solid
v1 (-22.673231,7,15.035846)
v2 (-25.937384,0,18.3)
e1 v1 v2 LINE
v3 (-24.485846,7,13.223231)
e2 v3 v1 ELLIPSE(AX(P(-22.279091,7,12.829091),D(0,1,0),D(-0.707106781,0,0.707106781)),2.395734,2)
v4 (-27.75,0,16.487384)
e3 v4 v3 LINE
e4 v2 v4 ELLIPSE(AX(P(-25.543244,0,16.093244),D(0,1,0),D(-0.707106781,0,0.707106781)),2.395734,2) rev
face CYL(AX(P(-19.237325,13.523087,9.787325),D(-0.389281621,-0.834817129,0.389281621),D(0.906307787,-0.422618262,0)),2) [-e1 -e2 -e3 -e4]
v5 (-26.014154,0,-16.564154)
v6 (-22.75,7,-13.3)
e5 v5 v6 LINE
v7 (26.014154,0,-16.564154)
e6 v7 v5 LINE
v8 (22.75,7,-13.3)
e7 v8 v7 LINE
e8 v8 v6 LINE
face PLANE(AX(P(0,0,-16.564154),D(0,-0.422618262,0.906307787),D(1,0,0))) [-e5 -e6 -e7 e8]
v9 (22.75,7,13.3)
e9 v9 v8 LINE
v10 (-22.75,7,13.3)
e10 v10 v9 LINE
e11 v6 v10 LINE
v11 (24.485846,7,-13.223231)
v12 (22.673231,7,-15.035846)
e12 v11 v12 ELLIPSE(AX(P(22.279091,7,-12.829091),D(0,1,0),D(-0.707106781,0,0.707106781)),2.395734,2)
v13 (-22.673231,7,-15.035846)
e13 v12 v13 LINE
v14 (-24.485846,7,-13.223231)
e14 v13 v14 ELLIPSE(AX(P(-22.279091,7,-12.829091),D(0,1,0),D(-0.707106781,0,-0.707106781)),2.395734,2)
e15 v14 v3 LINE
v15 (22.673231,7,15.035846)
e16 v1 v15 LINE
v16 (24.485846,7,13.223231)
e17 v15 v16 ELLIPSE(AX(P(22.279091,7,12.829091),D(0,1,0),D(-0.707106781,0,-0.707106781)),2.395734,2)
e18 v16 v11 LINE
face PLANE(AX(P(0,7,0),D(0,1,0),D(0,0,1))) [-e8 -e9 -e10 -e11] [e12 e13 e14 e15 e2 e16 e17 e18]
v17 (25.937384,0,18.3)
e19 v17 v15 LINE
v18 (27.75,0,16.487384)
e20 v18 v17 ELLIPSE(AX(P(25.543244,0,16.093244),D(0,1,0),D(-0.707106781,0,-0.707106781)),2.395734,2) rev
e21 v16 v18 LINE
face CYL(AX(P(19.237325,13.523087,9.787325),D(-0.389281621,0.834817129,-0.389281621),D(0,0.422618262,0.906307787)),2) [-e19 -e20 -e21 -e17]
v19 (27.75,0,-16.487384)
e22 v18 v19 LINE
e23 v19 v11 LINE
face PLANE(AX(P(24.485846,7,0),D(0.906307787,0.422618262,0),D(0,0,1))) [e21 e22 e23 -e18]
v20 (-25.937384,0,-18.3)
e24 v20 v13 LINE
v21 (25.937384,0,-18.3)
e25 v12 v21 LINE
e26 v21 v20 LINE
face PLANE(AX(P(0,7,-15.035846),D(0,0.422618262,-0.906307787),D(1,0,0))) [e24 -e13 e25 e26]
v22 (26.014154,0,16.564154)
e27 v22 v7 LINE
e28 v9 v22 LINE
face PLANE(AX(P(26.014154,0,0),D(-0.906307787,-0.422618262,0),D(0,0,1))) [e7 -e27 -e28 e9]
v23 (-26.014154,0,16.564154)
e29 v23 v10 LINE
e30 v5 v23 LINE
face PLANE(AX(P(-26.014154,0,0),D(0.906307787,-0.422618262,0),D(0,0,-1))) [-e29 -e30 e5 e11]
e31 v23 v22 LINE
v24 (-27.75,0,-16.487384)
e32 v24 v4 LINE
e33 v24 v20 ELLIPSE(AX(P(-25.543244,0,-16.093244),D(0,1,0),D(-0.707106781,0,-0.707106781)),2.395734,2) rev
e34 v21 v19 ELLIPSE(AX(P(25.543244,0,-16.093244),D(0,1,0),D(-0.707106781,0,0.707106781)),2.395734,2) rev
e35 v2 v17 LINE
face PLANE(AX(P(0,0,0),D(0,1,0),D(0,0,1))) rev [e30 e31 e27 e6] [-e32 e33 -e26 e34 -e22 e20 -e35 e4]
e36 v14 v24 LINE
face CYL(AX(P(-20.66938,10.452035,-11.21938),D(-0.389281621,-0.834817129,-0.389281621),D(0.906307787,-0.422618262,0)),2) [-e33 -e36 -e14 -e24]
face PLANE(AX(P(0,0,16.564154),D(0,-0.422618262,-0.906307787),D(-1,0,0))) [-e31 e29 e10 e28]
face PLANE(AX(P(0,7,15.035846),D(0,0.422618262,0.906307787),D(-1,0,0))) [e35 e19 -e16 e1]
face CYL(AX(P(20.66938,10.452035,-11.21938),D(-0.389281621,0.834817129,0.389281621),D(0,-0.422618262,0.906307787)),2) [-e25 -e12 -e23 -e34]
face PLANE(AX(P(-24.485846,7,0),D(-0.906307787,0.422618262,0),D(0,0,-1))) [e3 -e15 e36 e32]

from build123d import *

# Parameters (mm, degrees)
ESQUISSE2_W        = 55.5
ESQUISSE2_H        = 36.6
ESQUISSE2_W_2      = 45.5
ESQUISSE2_H_2      = 26.6
BOSS_EXTRU_1_DEPTH = 7
CONG_3_R           = 2


with BuildPart() as part:
    # Esquisse2 → Boss.-Extru.1 (new body)
    with BuildSketch(Plane(origin=(0, 0, 0), x_dir=(1, 0, 0), z_dir=(0, 1, 0))):
        Rectangle(ESQUISSE2_W, ESQUISSE2_H)
        Rectangle(ESQUISSE2_W_2, ESQUISSE2_H_2, mode=Mode.SUBTRACT)
    extrude(amount=BOSS_EXTRU_1_DEPTH)

    # Chanfrein1
    # the kernel refuses this chamfer: 7, 3.264153607 mm, written as the material it takes off along each edge
    with BuildSketch(Plane(origin=(27.75, 7, 18.3), x_dir=(0, -0.9998669641130704, 0.01631116413111024), z_dir=(-1, 0, 0)), Plane(origin=(-27.75, 7, -18.3), x_dir=(0, -0.9998669641130704, -0.01631116413111024), z_dir=(1, 0, 0))) as chanfrein1_piece_1:
        with BuildLine():
            Line((7.25473132, 0), (-0.308904716, -3.377897506))
            Line((-0.308904716, -3.377897506), (-0.448886091, -3.375613943))
            ThreePointArc((-0.448886091, -3.375613943), (-0.167567523, -1.688734801), (-0.139981375, 0.002283563))
            Line((-0.139981375, 0.002283563), (0.002283563, 0.139981375))
            ThreePointArc((0.002283563, 0.139981375), (3.628684148, 0.08082269), (7.257014883, 0.139981375))
            Line((7.257014883, 0.139981375), (7.25473132, 0))
        make_face()
    extrude(amount=55.5, mode=Mode.SUBTRACT)
    with BuildSketch(Plane(origin=(27.75, 7, -18.3), x_dir=(0.01631116413111024, -0.9998669641130704, 0), z_dir=(0, 0, 1)), Plane(origin=(-27.75, 7, 18.3), x_dir=(-0.01631116413111024, -0.9998669641130704, 0), z_dir=(0, 0, -1))) as chanfrein1_piece_2:
        with BuildLine():
            Line((7.25473132, 0), (-0.308904716, -3.377897506))
            Line((-0.308904716, -3.377897506), (-0.448886091, -3.375613943))
            ThreePointArc((-0.448886091, -3.375613943), (-0.167567523, -1.688734801), (-0.139981375, 0.002283563))
            Line((-0.139981375, 0.002283563), (0.002283563, 0.139981375))
            ThreePointArc((0.002283563, 0.139981375), (3.628684148, 0.08082269), (7.257014883, 0.139981375))
            Line((7.257014883, 0.139981375), (7.25473132, 0))
        make_face()
    extrude(amount=36.6, mode=Mode.SUBTRACT)
    with BuildSketch(Plane(origin=(22.75, 0, 13.3), x_dir=(0, 0.9998669641130704, -0.016311164131110483), z_dir=(-1, 0, 0)), Plane(origin=(-22.75, 0, -13.3), x_dir=(0, 0.9998669641130704, 0.016311164131110483), z_dir=(1, 0, 0))) as chanfrein1_piece_3:
        with BuildLine():
            Line((7.25473132, 0), (-0.308904716, -3.377897506))
            Line((-0.308904716, -3.377897506), (-0.448886091, -3.375613943))
            ThreePointArc((-0.448886091, -3.375613943), (-0.167567523, -1.688734801), (-0.139981375, 0.002283563))
            Line((-0.139981375, 0.002283563), (0.002283563, 0.139981375))
            ThreePointArc((0.002283563, 0.139981375), (3.628684148, 0.08082269), (7.257014883, 0.139981375))
            Line((7.257014883, 0.139981375), (7.25473132, 0))
        make_face()
    extrude(amount=45.5, mode=Mode.SUBTRACT)
    with BuildSketch(Plane(origin=(-22.75, 0, 13.3), x_dir=(0.01631116413111024, 0.9998669641130704, 0), z_dir=(0, 0, -1)), Plane(origin=(22.75, 0, -13.3), x_dir=(-0.01631116413111024, 0.9998669641130704, 0), z_dir=(0, 0, 1))) as chanfrein1_piece_4:
        with BuildLine():
            Line((7.25473132, 0), (-0.308904716, -3.377897506))
            Line((-0.308904716, -3.377897506), (-0.448886091, -3.375613943))
            ThreePointArc((-0.448886091, -3.375613943), (-0.167567523, -1.688734801), (-0.139981375, 0.002283563))
            Line((-0.139981375, 0.002283563), (0.002283563, 0.139981375))
            ThreePointArc((0.002283563, 0.139981375), (3.628684148, 0.08082269), (7.257014883, 0.139981375))
            Line((7.257014883, 0.139981375), (7.25473132, 0))
        make_face()
    extrude(amount=26.6, mode=Mode.SUBTRACT)
    with BuildSketch(Plane(origin=(27.75, 7, -18.3), x_dir=(0.01631116413111024, -0.9998669641130704, 0), z_dir=(0, 0, 1))) as chanfrein1_piece_5a_section:
        with BuildLine():
            Line((7.25473132, 0), (-0.308904716, -3.377897506))
            Line((-0.308904716, -3.377897506), (-0.448886091, -3.375613943))
            ThreePointArc((-0.448886091, -3.375613943), (-0.167567523, -1.688734801), (-0.139981375, 0.002283563))
            Line((-0.139981375, 0.002283563), (0.002283563, 0.139981375))
            ThreePointArc((0.002283563, 0.139981375), (3.628684148, 0.08082269), (7.257014883, 0.139981375))
            Line((7.257014883, 0.139981375), (7.25473132, 0))
        make_face()
    chanfrein1_piece_5a = extrude(amount=54.7368283, mode=Mode.PRIVATE)
    chanfrein1_piece_5a = split(chanfrein1_piece_5a, bisect_by=Plane(origin=(26.72067158, 4.632350976, 18.3), z_dir=(0, 0, 1)), keep=Keep.TOP, mode=Mode.PRIVATE)
    with BuildSketch(Plane(origin=(45.8868283, 7, 18.3), x_dir=(0, -0.9998669641130704, 0.01631116413111024), z_dir=(-1, 0, 0))) as chanfrein1_piece_5b_section:
        with BuildLine():
            Line((7.25473132, 0), (-0.308904716, -3.377897506))
            Line((-0.308904716, -3.377897506), (-0.448886091, -3.375613943))
            ThreePointArc((-0.448886091, -3.375613943), (-0.167567523, -1.688734801), (-0.139981375, 0.002283563))
            Line((-0.139981375, 0.002283563), (0.002283563, 0.139981375))
            ThreePointArc((0.002283563, 0.139981375), (3.628684148, 0.08082269), (7.257014883, 0.139981375))
            Line((7.257014883, 0.139981375), (7.25473132, 0))
        make_face()
    chanfrein1_piece_5b = extrude(amount=73.6368283, mode=Mode.PRIVATE)
    chanfrein1_piece_5b = split(chanfrein1_piece_5b, bisect_by=Plane(origin=(27.75, 4.632350976, 17.27067158), z_dir=(1, 0, 0)), keep=Keep.TOP, mode=Mode.PRIVATE)
    chanfrein1_piece_5 = chanfrein1_piece_5a & chanfrein1_piece_5b
    add(chanfrein1_piece_5, mode=Mode.SUBTRACT)
    with BuildSketch(Plane(origin=(27.75, 7, 18.3), x_dir=(0, -0.9998669641130704, 0.01631116413111024), z_dir=(-1, 0, 0))) as chanfrein1_piece_6a_section:
        with BuildLine():
            Line((7.25473132, 0), (-0.308904716, -3.377897506))
            Line((-0.308904716, -3.377897506), (-0.448886091, -3.375613943))
            ThreePointArc((-0.448886091, -3.375613943), (-0.167567523, -1.688734801), (-0.139981375, 0.002283563))
            Line((-0.139981375, 0.002283563), (0.002283563, 0.139981375))
            ThreePointArc((0.002283563, 0.139981375), (3.628684148, 0.08082269), (7.257014883, 0.139981375))
            Line((7.257014883, 0.139981375), (7.25473132, 0))
        make_face()
    chanfrein1_piece_6a = extrude(amount=73.6368283, mode=Mode.PRIVATE)
    chanfrein1_piece_6a = split(chanfrein1_piece_6a, bisect_by=Plane(origin=(-27.75, 4.632350976, 17.27067158), z_dir=(-1, 0, 0)), keep=Keep.TOP, mode=Mode.PRIVATE)
    with BuildSketch(Plane(origin=(-27.75, 7, 36.4368283), x_dir=(-0.01631116413111024, -0.9998669641130704, 0), z_dir=(0, 0, -1))) as chanfrein1_piece_6b_section:
        with BuildLine():
            Line((7.25473132, 0), (-0.308904716, -3.377897506))
            Line((-0.308904716, -3.377897506), (-0.448886091, -3.375613943))
            ThreePointArc((-0.448886091, -3.375613943), (-0.167567523, -1.688734801), (-0.139981375, 0.002283563))
            Line((-0.139981375, 0.002283563), (0.002283563, 0.139981375))
            ThreePointArc((0.002283563, 0.139981375), (3.628684148, 0.08082269), (7.257014883, 0.139981375))
            Line((7.257014883, 0.139981375), (7.25473132, 0))
        make_face()
    chanfrein1_piece_6b = extrude(amount=54.7368283, mode=Mode.PRIVATE)
    chanfrein1_piece_6b = split(chanfrein1_piece_6b, bisect_by=Plane(origin=(-26.72067158, 4.632350976, 18.3), z_dir=(0, 0, 1)), keep=Keep.TOP, mode=Mode.PRIVATE)
    chanfrein1_piece_6 = chanfrein1_piece_6a & chanfrein1_piece_6b
    add(chanfrein1_piece_6, mode=Mode.SUBTRACT)
    with BuildSketch(Plane(origin=(-27.75, 7, -18.3), x_dir=(0, -0.9998669641130704, -0.01631116413111024), z_dir=(1, 0, 0))) as chanfrein1_piece_7a_section:
        with BuildLine():
            Line((7.25473132, 0), (-0.308904716, -3.377897506))
            Line((-0.308904716, -3.377897506), (-0.448886091, -3.375613943))
            ThreePointArc((-0.448886091, -3.375613943), (-0.167567523, -1.688734801), (-0.139981375, 0.002283563))
            Line((-0.139981375, 0.002283563), (0.002283563, 0.139981375))
            ThreePointArc((0.002283563, 0.139981375), (3.628684148, 0.08082269), (7.257014883, 0.139981375))
            Line((7.257014883, 0.139981375), (7.25473132, 0))
        make_face()
    chanfrein1_piece_7a = extrude(amount=73.6368283, mode=Mode.PRIVATE)
    chanfrein1_piece_7a = split(chanfrein1_piece_7a, bisect_by=Plane(origin=(27.75, 4.632350976, -17.27067158), z_dir=(1, 0, 0)), keep=Keep.TOP, mode=Mode.PRIVATE)
    with BuildSketch(Plane(origin=(27.75, 7, -36.4368283), x_dir=(0.01631116413111024, -0.9998669641130704, 0), z_dir=(0, 0, 1))) as chanfrein1_piece_7b_section:
        with BuildLine():
            Line((7.25473132, 0), (-0.308904716, -3.377897506))
            Line((-0.308904716, -3.377897506), (-0.448886091, -3.375613943))
            ThreePointArc((-0.448886091, -3.375613943), (-0.167567523, -1.688734801), (-0.139981375, 0.002283563))
            Line((-0.139981375, 0.002283563), (0.002283563, 0.139981375))
            ThreePointArc((0.002283563, 0.139981375), (3.628684148, 0.08082269), (7.257014883, 0.139981375))
            Line((7.257014883, 0.139981375), (7.25473132, 0))
        make_face()
    chanfrein1_piece_7b = extrude(amount=54.7368283, mode=Mode.PRIVATE)
    chanfrein1_piece_7b = split(chanfrein1_piece_7b, bisect_by=Plane(origin=(26.72067158, 4.632350976, -18.3), z_dir=(0, 0, -1)), keep=Keep.TOP, mode=Mode.PRIVATE)
    chanfrein1_piece_7 = chanfrein1_piece_7a & chanfrein1_piece_7b
    add(chanfrein1_piece_7, mode=Mode.SUBTRACT)
    with BuildSketch(Plane(origin=(-45.8868283, 7, -18.3), x_dir=(0, -0.9998669641130704, -0.01631116413111024), z_dir=(1, 0, 0))) as chanfrein1_piece_8a_section:
        with BuildLine():
            Line((7.25473132, 0), (-0.308904716, -3.377897506))
            Line((-0.308904716, -3.377897506), (-0.448886091, -3.375613943))
            ThreePointArc((-0.448886091, -3.375613943), (-0.167567523, -1.688734801), (-0.139981375, 0.002283563))
            Line((-0.139981375, 0.002283563), (0.002283563, 0.139981375))
            ThreePointArc((0.002283563, 0.139981375), (3.628684148, 0.08082269), (7.257014883, 0.139981375))
            Line((7.257014883, 0.139981375), (7.25473132, 0))
        make_face()
    chanfrein1_piece_8a = extrude(amount=73.6368283, mode=Mode.PRIVATE)
    chanfrein1_piece_8a = split(chanfrein1_piece_8a, bisect_by=Plane(origin=(-27.75, 4.632350976, -17.27067158), z_dir=(-1, 0, 0)), keep=Keep.TOP, mode=Mode.PRIVATE)
    with BuildSketch(Plane(origin=(-27.75, 7, 18.3), x_dir=(-0.01631116413111024, -0.9998669641130704, 0), z_dir=(0, 0, -1))) as chanfrein1_piece_8b_section:
        with BuildLine():
            Line((7.25473132, 0), (-0.308904716, -3.377897506))
            Line((-0.308904716, -3.377897506), (-0.448886091, -3.375613943))
            ThreePointArc((-0.448886091, -3.375613943), (-0.167567523, -1.688734801), (-0.139981375, 0.002283563))
            Line((-0.139981375, 0.002283563), (0.002283563, 0.139981375))
            ThreePointArc((0.002283563, 0.139981375), (3.628684148, 0.08082269), (7.257014883, 0.139981375))
            Line((7.257014883, 0.139981375), (7.25473132, 0))
        make_face()
    chanfrein1_piece_8b = extrude(amount=54.7368283, mode=Mode.PRIVATE)
    chanfrein1_piece_8b = split(chanfrein1_piece_8b, bisect_by=Plane(origin=(-26.72067158, 4.632350976, -18.3), z_dir=(0, 0, -1)), keep=Keep.TOP, mode=Mode.PRIVATE)
    chanfrein1_piece_8 = chanfrein1_piece_8a & chanfrein1_piece_8b
    add(chanfrein1_piece_8, mode=Mode.SUBTRACT)
    with BuildSketch(Plane(origin=(40.8868283, 0, 13.3), x_dir=(0, 0.9998669641130704, -0.016311164131110483), z_dir=(-1, 0, 0))) as chanfrein1_piece_9a_section:
        with BuildLine():
            Line((7.25473132, 0), (-0.308904716, -3.377897506))
            Line((-0.308904716, -3.377897506), (-0.448886091, -3.375613943))
            ThreePointArc((-0.448886091, -3.375613943), (-0.167567523, -1.688734801), (-0.139981375, 0.002283563))
            Line((-0.139981375, 0.002283563), (0.002283563, 0.139981375))
            ThreePointArc((0.002283563, 0.139981375), (3.628684148, 0.08082269), (7.257014883, 0.139981375))
            Line((7.257014883, 0.139981375), (7.25473132, 0))
        make_face()
    chanfrein1_piece_9a = extrude(amount=63.6368283, mode=Mode.PRIVATE)
    chanfrein1_piece_9a = split(chanfrein1_piece_9a, bisect_by=Plane(origin=(22.75, 2.367649024, 14.32932842), z_dir=(1, 0, 0)), keep=Keep.TOP, mode=Mode.PRIVATE)
    with BuildSketch(Plane(origin=(22.75, 0, -13.3), x_dir=(-0.01631116413111024, 0.9998669641130704, 0), z_dir=(0, 0, 1))) as chanfrein1_piece_9b_section:
        with BuildLine():
            Line((7.25473132, 0), (-0.308904716, -3.377897506))
            Line((-0.308904716, -3.377897506), (-0.448886091, -3.375613943))
            ThreePointArc((-0.448886091, -3.375613943), (-0.167567523, -1.688734801), (-0.139981375, 0.002283563))
            Line((-0.139981375, 0.002283563), (0.002283563, 0.139981375))
            ThreePointArc((0.002283563, 0.139981375), (3.628684148, 0.08082269), (7.257014883, 0.139981375))
            Line((7.257014883, 0.139981375), (7.25473132, 0))
        make_face()
    chanfrein1_piece_9b = extrude(amount=44.7368283, mode=Mode.PRIVATE)
    chanfrein1_piece_9b = split(chanfrein1_piece_9b, bisect_by=Plane(origin=(23.77932842, 2.367649024, 13.3), z_dir=(0, 0, 1)), keep=Keep.TOP, mode=Mode.PRIVATE)
    chanfrein1_piece_9 = chanfrein1_piece_9a & chanfrein1_piece_9b
    add(chanfrein1_piece_9, mode=Mode.SUBTRACT)
    with BuildSketch(Plane(origin=(-22.75, 0, 31.4368283), x_dir=(0.01631116413111024, 0.9998669641130704, 0), z_dir=(0, 0, -1))) as chanfrein1_piece_10a_section:
        with BuildLine():
            Line((7.25473132, 0), (-0.308904716, -3.377897506))
            Line((-0.308904716, -3.377897506), (-0.448886091, -3.375613943))
            ThreePointArc((-0.448886091, -3.375613943), (-0.167567523, -1.688734801), (-0.139981375, 0.002283563))
            Line((-0.139981375, 0.002283563), (0.002283563, 0.139981375))
            ThreePointArc((0.002283563, 0.139981375), (3.628684148, 0.08082269), (7.257014883, 0.139981375))
            Line((7.257014883, 0.139981375), (7.25473132, 0))
        make_face()
    chanfrein1_piece_10a = extrude(amount=44.7368283, mode=Mode.PRIVATE)
    chanfrein1_piece_10a = split(chanfrein1_piece_10a, bisect_by=Plane(origin=(-23.77932842, 2.367649024, 13.3), z_dir=(0, 0, 1)), keep=Keep.TOP, mode=Mode.PRIVATE)
    with BuildSketch(Plane(origin=(22.75, 0, 13.3), x_dir=(0, 0.9998669641130704, -0.016311164131110483), z_dir=(-1, 0, 0))) as chanfrein1_piece_10b_section:
        with BuildLine():
            Line((7.25473132, 0), (-0.308904716, -3.377897506))
            Line((-0.308904716, -3.377897506), (-0.448886091, -3.375613943))
            ThreePointArc((-0.448886091, -3.375613943), (-0.167567523, -1.688734801), (-0.139981375, 0.002283563))
            Line((-0.139981375, 0.002283563), (0.002283563, 0.139981375))
            ThreePointArc((0.002283563, 0.139981375), (3.628684148, 0.08082269), (7.257014883, 0.139981375))
            Line((7.257014883, 0.139981375), (7.25473132, 0))
        make_face()
    chanfrein1_piece_10b = extrude(amount=63.6368283, mode=Mode.PRIVATE)
    chanfrein1_piece_10b = split(chanfrein1_piece_10b, bisect_by=Plane(origin=(-22.75, 2.367649024, 14.32932842), z_dir=(-1, 0, 0)), keep=Keep.TOP, mode=Mode.PRIVATE)
    chanfrein1_piece_10 = chanfrein1_piece_10a & chanfrein1_piece_10b
    add(chanfrein1_piece_10, mode=Mode.SUBTRACT)
    with BuildSketch(Plane(origin=(-22.75, 0, 13.3), x_dir=(0.01631116413111024, 0.9998669641130704, 0), z_dir=(0, 0, -1))) as chanfrein1_piece_11a_section:
        with BuildLine():
            Line((7.25473132, 0), (-0.308904716, -3.377897506))
            Line((-0.308904716, -3.377897506), (-0.448886091, -3.375613943))
            ThreePointArc((-0.448886091, -3.375613943), (-0.167567523, -1.688734801), (-0.139981375, 0.002283563))
            Line((-0.139981375, 0.002283563), (0.002283563, 0.139981375))
            ThreePointArc((0.002283563, 0.139981375), (3.628684148, 0.08082269), (7.257014883, 0.139981375))
            Line((7.257014883, 0.139981375), (7.25473132, 0))
        make_face()
    chanfrein1_piece_11a = extrude(amount=44.7368283, mode=Mode.PRIVATE)
    chanfrein1_piece_11a = split(chanfrein1_piece_11a, bisect_by=Plane(origin=(-23.77932842, 2.367649024, -13.3), z_dir=(0, 0, -1)), keep=Keep.TOP, mode=Mode.PRIVATE)
    with BuildSketch(Plane(origin=(-40.8868283, 0, -13.3), x_dir=(0, 0.9998669641130704, 0.016311164131110483), z_dir=(1, 0, 0))) as chanfrein1_piece_11b_section:
        with BuildLine():
            Line((7.25473132, 0), (-0.308904716, -3.377897506))
            Line((-0.308904716, -3.377897506), (-0.448886091, -3.375613943))
            ThreePointArc((-0.448886091, -3.375613943), (-0.167567523, -1.688734801), (-0.139981375, 0.002283563))
            Line((-0.139981375, 0.002283563), (0.002283563, 0.139981375))
            ThreePointArc((0.002283563, 0.139981375), (3.628684148, 0.08082269), (7.257014883, 0.139981375))
            Line((7.257014883, 0.139981375), (7.25473132, 0))
        make_face()
    chanfrein1_piece_11b = extrude(amount=63.6368283, mode=Mode.PRIVATE)
    chanfrein1_piece_11b = split(chanfrein1_piece_11b, bisect_by=Plane(origin=(-22.75, 2.367649024, -14.32932842), z_dir=(-1, 0, 0)), keep=Keep.TOP, mode=Mode.PRIVATE)
    chanfrein1_piece_11 = chanfrein1_piece_11a & chanfrein1_piece_11b
    add(chanfrein1_piece_11, mode=Mode.SUBTRACT)
    with BuildSketch(Plane(origin=(22.75, 0, -31.4368283), x_dir=(-0.01631116413111024, 0.9998669641130704, 0), z_dir=(0, 0, 1))) as chanfrein1_piece_12a_section:
        with BuildLine():
            Line((7.25473132, 0), (-0.308904716, -3.377897506))
            Line((-0.308904716, -3.377897506), (-0.448886091, -3.375613943))
            ThreePointArc((-0.448886091, -3.375613943), (-0.167567523, -1.688734801), (-0.139981375, 0.002283563))
            Line((-0.139981375, 0.002283563), (0.002283563, 0.139981375))
            ThreePointArc((0.002283563, 0.139981375), (3.628684148, 0.08082269), (7.257014883, 0.139981375))
            Line((7.257014883, 0.139981375), (7.25473132, 0))
        make_face()
    chanfrein1_piece_12a = extrude(amount=44.7368283, mode=Mode.PRIVATE)
    chanfrein1_piece_12a = split(chanfrein1_piece_12a, bisect_by=Plane(origin=(23.77932842, 2.367649024, -13.3), z_dir=(0, 0, -1)), keep=Keep.TOP, mode=Mode.PRIVATE)
    with BuildSketch(Plane(origin=(-22.75, 0, -13.3), x_dir=(0, 0.9998669641130704, 0.016311164131110483), z_dir=(1, 0, 0))) as chanfrein1_piece_12b_section:
        with BuildLine():
            Line((7.25473132, 0), (-0.308904716, -3.377897506))
            Line((-0.308904716, -3.377897506), (-0.448886091, -3.375613943))
            ThreePointArc((-0.448886091, -3.375613943), (-0.167567523, -1.688734801), (-0.139981375, 0.002283563))
            Line((-0.139981375, 0.002283563), (0.002283563, 0.139981375))
            ThreePointArc((0.002283563, 0.139981375), (3.628684148, 0.08082269), (7.257014883, 0.139981375))
            Line((7.257014883, 0.139981375), (7.25473132, 0))
        make_face()
    chanfrein1_piece_12b = extrude(amount=63.6368283, mode=Mode.PRIVATE)
    chanfrein1_piece_12b = split(chanfrein1_piece_12b, bisect_by=Plane(origin=(22.75, 2.367649024, -14.32932842), z_dir=(1, 0, 0)), keep=Keep.TOP, mode=Mode.PRIVATE)
    chanfrein1_piece_12 = chanfrein1_piece_12a & chanfrein1_piece_12b
    add(chanfrein1_piece_12, mode=Mode.SUBTRACT)

    # Congé3
    cong_3_edges = [part.edges().sort_by_distance(p)[0] for p in [
        (-26.117923196, 3.5, -16.667923196),
        (26.117923196, 3.5, -16.667923196),
        (-26.117923196, 3.5, 16.667923196),
        (26.117923196, 3.5, 16.667923196),
    ]]
    fillet(cong_3_edges, radius=CONG_3_R)


solid = part.part
